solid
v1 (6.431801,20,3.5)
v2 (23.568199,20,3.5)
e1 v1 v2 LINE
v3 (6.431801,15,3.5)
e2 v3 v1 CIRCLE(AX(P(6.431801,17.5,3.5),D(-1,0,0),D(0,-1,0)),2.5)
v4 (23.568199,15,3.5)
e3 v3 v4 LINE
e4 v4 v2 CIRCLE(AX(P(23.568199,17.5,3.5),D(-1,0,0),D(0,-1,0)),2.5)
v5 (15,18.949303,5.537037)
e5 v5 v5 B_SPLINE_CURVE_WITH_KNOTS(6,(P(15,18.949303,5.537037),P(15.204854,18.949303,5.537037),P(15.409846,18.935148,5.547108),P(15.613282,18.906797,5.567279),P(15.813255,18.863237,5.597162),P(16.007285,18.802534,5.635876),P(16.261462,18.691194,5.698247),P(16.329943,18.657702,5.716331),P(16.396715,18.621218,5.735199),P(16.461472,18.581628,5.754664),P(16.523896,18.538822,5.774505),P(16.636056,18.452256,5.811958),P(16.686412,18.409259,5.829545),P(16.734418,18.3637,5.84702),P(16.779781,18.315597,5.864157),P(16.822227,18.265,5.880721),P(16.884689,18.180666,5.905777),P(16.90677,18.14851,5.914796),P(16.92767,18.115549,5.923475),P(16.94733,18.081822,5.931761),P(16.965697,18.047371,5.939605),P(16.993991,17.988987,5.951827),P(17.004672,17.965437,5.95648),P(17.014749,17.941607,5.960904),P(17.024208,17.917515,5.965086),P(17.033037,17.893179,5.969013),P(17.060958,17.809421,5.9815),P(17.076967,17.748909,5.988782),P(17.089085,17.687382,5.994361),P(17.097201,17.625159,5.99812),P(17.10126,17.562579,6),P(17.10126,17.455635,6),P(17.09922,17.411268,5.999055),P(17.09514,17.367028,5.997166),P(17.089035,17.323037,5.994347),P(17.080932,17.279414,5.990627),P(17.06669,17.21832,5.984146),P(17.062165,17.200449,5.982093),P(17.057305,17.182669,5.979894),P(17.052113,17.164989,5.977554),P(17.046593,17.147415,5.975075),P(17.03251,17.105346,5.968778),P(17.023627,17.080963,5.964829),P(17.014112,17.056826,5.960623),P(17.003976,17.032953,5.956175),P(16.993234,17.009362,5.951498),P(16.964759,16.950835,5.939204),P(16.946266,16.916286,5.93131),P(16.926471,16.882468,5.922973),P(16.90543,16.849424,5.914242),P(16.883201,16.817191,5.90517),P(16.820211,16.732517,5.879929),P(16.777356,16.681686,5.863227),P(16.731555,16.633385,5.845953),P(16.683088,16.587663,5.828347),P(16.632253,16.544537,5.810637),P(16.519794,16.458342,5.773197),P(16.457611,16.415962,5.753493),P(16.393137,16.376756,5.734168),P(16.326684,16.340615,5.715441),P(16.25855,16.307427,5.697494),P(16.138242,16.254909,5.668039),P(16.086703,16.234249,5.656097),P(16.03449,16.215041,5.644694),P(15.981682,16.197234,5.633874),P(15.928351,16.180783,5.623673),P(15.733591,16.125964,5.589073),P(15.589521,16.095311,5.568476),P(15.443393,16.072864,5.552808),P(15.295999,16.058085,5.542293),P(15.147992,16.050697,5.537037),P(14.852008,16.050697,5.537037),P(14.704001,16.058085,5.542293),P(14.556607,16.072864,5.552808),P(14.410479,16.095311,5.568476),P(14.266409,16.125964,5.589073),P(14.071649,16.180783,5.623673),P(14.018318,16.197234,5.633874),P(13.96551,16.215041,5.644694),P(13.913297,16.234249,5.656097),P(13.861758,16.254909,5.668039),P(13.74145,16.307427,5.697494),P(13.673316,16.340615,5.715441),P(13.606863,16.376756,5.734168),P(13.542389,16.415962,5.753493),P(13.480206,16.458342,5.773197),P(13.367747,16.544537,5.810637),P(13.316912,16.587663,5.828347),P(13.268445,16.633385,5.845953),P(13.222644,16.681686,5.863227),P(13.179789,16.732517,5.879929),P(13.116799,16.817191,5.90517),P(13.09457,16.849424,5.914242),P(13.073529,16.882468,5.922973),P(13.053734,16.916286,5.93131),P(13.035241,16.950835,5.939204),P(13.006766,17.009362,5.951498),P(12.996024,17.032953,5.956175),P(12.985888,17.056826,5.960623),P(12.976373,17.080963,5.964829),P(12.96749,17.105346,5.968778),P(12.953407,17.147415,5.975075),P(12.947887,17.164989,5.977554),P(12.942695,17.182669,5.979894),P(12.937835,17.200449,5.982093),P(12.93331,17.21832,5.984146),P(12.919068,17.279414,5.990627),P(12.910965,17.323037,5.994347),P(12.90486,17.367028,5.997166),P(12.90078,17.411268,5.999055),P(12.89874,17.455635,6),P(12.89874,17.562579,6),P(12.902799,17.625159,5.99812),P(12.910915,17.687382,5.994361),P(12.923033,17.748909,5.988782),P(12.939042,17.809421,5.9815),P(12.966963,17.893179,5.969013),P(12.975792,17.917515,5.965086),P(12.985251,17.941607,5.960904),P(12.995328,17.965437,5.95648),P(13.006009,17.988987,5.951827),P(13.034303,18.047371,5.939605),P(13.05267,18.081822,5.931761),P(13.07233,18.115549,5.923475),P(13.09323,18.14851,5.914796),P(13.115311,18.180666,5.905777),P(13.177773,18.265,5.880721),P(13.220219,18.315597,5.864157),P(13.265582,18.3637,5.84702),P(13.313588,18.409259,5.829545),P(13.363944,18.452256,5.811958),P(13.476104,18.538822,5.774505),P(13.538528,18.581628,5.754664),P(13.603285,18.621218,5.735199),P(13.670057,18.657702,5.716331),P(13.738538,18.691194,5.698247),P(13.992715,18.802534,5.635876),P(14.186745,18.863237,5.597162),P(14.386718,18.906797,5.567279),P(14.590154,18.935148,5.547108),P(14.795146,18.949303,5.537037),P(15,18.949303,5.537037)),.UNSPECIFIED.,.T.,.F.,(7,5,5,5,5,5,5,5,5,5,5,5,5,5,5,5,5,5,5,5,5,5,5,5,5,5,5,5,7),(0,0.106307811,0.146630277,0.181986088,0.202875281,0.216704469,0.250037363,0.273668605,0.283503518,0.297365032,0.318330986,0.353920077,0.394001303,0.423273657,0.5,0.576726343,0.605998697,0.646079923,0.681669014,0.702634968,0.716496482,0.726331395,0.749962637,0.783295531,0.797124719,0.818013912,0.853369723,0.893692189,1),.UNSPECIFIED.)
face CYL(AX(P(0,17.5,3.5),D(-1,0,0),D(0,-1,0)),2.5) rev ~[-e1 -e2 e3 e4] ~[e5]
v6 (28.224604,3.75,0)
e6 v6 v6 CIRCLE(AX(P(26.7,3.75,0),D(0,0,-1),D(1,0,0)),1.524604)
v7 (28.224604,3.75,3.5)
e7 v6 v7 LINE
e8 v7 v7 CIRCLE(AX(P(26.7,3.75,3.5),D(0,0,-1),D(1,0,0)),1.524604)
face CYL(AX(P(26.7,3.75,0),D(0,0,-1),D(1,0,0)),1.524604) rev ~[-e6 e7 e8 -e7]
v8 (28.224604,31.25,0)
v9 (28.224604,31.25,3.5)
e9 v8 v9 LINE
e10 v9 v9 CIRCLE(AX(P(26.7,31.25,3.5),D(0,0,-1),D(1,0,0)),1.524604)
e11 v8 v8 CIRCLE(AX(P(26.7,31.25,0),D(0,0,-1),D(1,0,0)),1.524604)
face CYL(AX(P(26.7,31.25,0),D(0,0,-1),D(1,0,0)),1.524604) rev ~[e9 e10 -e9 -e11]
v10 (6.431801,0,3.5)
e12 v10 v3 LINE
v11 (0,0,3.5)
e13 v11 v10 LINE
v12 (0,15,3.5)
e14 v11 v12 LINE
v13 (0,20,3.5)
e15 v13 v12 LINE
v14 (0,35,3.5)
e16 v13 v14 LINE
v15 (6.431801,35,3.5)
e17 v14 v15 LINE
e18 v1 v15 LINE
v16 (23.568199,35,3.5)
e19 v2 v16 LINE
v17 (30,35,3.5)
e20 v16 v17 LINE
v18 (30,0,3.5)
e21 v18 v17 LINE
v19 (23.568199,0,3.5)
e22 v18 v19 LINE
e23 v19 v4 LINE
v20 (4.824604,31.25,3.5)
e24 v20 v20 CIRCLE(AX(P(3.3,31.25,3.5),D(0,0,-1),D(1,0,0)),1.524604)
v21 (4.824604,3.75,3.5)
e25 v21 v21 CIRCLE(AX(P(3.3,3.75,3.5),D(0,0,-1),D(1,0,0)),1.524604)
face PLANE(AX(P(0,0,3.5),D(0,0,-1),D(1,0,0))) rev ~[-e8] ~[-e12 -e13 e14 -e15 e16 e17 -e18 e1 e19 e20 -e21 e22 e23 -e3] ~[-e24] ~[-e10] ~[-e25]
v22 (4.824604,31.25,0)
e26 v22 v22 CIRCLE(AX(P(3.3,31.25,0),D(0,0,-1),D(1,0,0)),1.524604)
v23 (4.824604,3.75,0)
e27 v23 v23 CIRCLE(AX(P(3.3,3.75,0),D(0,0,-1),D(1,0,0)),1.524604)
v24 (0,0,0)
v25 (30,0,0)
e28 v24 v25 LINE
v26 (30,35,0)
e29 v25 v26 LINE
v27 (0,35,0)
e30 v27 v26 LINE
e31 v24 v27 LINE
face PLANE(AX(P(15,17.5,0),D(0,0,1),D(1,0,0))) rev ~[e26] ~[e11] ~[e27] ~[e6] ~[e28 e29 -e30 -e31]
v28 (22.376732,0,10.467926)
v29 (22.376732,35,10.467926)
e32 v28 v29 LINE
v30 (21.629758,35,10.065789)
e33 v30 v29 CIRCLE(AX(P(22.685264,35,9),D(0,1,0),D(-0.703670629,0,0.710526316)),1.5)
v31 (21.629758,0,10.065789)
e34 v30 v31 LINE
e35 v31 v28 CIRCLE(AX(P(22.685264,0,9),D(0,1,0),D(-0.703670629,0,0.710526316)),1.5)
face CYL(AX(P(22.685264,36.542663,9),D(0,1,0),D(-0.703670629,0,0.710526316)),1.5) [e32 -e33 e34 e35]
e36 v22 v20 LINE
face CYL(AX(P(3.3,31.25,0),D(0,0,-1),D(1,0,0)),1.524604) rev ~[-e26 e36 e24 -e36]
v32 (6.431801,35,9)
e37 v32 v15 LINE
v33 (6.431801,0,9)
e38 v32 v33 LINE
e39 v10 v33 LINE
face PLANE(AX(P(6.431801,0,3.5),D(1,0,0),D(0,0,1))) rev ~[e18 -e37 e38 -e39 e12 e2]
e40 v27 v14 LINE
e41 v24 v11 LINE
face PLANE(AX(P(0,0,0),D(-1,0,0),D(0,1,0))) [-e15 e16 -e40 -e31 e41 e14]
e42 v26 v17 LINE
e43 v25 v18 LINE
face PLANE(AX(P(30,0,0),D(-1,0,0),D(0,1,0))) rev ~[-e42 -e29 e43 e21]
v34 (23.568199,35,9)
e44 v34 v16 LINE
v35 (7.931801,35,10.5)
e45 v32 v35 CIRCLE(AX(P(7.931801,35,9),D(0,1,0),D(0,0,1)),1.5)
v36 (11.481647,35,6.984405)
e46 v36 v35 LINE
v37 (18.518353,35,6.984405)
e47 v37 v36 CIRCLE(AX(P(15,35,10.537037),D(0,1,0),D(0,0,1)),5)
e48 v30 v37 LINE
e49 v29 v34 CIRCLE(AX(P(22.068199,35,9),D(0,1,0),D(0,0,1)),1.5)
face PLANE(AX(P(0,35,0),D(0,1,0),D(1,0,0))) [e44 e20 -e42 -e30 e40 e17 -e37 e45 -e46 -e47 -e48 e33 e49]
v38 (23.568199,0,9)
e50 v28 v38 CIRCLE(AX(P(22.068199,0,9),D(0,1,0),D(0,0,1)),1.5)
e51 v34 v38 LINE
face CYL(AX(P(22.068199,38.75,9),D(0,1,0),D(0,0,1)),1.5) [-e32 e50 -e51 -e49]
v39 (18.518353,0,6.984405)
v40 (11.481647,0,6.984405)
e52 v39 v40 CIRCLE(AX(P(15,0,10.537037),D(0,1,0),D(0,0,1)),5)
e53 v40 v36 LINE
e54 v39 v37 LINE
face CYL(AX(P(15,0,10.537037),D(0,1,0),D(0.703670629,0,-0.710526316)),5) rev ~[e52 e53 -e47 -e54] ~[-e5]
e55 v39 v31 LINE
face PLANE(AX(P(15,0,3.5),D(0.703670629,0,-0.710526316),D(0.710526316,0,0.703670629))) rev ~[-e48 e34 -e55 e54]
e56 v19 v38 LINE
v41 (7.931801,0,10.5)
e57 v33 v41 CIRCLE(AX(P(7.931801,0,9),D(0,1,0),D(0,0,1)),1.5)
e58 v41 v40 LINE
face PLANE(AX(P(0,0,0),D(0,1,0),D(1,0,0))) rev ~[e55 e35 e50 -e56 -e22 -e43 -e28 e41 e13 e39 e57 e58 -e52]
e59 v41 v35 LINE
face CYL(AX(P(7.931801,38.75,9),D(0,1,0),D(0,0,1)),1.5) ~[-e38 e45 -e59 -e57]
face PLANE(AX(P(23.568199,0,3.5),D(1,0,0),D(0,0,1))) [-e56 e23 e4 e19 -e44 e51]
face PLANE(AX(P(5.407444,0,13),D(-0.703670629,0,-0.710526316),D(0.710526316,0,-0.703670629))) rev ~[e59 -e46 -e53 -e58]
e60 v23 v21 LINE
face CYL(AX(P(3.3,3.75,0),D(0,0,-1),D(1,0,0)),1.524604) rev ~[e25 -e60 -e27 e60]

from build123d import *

# Parameters (mm, degrees)
F0_W         = 30
F0_H         = 35
F1_DEPTH     = 13
F2_W         = 3.9074438825
F2_H         = 9.5
F3_DEPTH     = 35.001
F4_W         = 2.524356873
F4_H         = 7
F5_DEPTH     = 35.001
F6_R         = 5
F8_DEPTH     = 30.001
F9_R         = 1.5246036127
F10_DEPTH    = 10.501
F11_T1_DEPTH = 42.5
F11_T3_DEPTH = 38.085325067


# Not quite as in the source:
# - a fillet or chamfer that OpenCascade refuses, or shapes differently, is made with other operations: its cross-section is extruded or revolved along the edge and cut away or added


with BuildPart() as f1:
    # F0 (on Top) → F1 (new body)
    with BuildSketch(Plane.XY):
        with Locations((15, 17.5)):
            Rectangle(F0_W, F0_H)
    extrude(amount=F1_DEPTH)

    # F2 (on face) → F3 (cut, through all)
    with BuildSketch(Plane.XZ):
        with Locations((1.9537219413, 8.25)):
            Rectangle(F2_W, F2_H)
        Polygon((15, 13), (5.4074438825, 13), (15, 3.5), (24.5925561175, 13), align=None)
        with Locations((28.0462780587, 8.25)):
            Rectangle(F2_W, F2_H)
    extrude(amount=-F3_DEPTH, mode=Mode.SUBTRACT)

    # F4 (on face) → F5 (cut, through all)
    with BuildSketch(Plane.XZ):
        Polygon((6.4318007555, 10.5), (7.9318007555, 10.5), (5.4074438825, 13), (3.9074438825, 13), (3.9074438825, 10.5), align=None)
        Polygon((23.5681992445, 10.5), (26.0925561175, 10.5), (26.0925561175, 13), (24.5925561175, 13), (22.0681992445, 10.5), align=None)
        with Locations((5.169622319, 7)):
            Rectangle(F4_W, F4_H)
        with Locations((24.830377681, 7)):
            Rectangle(F4_W, F4_H)
    extrude(amount=-F5_DEPTH, mode=Mode.SUBTRACT)

    # F6
    f6_edges = [f1.edges().sort_by_distance(p)[0] for p in [
        (15, 17.5, 3.5),
    ]]
    fillet(f6_edges, radius=F6_R)

    # F7 (on face) → F8 (cut, through all)
    with BuildSketch(Plane(origin=(0, 0, 0), x_dir=(0, -1, 0), z_dir=(-1, 0, 0))):
        with BuildLine():
            ThreePointArc((-15, 3.5), (-17.5, 6), (-20, 3.5))
            Line((-20, 3.5), (-15, 3.5))
        make_face()
    extrude(amount=-F8_DEPTH, mode=Mode.SUBTRACT)

    # F9 (on face) → F10 (cut, through all)
    with BuildSketch(Plane(origin=(0, 0, 0), x_dir=(1, 0, 0), z_dir=(0, 0, -1))):
        with Locations((3.3, -3.75)):
            Circle(F9_R)
        with Locations((26.7, -3.75)):
            Circle(F9_R)
        with Locations((3.3, -31.25)):
            Circle(F9_R)
        with Locations((26.7, -31.25)):
            Circle(F9_R)
    extrude(amount=-F10_DEPTH, mode=Mode.SUBTRACT)

    # F11: fillet of radius 1.5 on 3 edges, made by hand

    # F11_s2 → F11_t1 (cut)
    with BuildSketch(Plane.XZ.offset(-38.75)):
        with BuildLine():
            ThreePointArc((7.9318007555, 10.5), (6.8711405838, 10.0606601718), (6.4318007555, 9))
            Line((6.4318007555, 9), (6.4318007555, 10.5))
            Line((6.4318007555, 10.5), (7.9318007555, 10.5))
        make_face()
        with BuildLine():
            ThreePointArc((22.0681992445, 10.5), (23.1288594162, 10.0606601718), (23.5681992445, 9))
            Line((23.5681992445, 9), (23.5681992445, 10.5))
            Line((23.5681992445, 10.5), (22.0681992445, 10.5))
        make_face()
    extrude(amount=F11_T1_DEPTH, mode=Mode.SUBTRACT)

    # F11_s4 → F11_t3 (cut)
    with BuildSketch(Plane.XZ.offset(-36.5426625335)):
        with BuildLine():
            ThreePointArc((21.6297583139, 10.0657894737), (22.1145998252, 10.3872065835), (22.6852642579, 10.5))
            Line((22.6852642579, 10.5), (22.0681992445, 10.5))
            Line((22.0681992445, 10.5), (21.6297583139, 10.0657894737))
        make_face()
    extrude(amount=F11_T3_DEPTH, mode=Mode.SUBTRACT)


solid = f1.part
